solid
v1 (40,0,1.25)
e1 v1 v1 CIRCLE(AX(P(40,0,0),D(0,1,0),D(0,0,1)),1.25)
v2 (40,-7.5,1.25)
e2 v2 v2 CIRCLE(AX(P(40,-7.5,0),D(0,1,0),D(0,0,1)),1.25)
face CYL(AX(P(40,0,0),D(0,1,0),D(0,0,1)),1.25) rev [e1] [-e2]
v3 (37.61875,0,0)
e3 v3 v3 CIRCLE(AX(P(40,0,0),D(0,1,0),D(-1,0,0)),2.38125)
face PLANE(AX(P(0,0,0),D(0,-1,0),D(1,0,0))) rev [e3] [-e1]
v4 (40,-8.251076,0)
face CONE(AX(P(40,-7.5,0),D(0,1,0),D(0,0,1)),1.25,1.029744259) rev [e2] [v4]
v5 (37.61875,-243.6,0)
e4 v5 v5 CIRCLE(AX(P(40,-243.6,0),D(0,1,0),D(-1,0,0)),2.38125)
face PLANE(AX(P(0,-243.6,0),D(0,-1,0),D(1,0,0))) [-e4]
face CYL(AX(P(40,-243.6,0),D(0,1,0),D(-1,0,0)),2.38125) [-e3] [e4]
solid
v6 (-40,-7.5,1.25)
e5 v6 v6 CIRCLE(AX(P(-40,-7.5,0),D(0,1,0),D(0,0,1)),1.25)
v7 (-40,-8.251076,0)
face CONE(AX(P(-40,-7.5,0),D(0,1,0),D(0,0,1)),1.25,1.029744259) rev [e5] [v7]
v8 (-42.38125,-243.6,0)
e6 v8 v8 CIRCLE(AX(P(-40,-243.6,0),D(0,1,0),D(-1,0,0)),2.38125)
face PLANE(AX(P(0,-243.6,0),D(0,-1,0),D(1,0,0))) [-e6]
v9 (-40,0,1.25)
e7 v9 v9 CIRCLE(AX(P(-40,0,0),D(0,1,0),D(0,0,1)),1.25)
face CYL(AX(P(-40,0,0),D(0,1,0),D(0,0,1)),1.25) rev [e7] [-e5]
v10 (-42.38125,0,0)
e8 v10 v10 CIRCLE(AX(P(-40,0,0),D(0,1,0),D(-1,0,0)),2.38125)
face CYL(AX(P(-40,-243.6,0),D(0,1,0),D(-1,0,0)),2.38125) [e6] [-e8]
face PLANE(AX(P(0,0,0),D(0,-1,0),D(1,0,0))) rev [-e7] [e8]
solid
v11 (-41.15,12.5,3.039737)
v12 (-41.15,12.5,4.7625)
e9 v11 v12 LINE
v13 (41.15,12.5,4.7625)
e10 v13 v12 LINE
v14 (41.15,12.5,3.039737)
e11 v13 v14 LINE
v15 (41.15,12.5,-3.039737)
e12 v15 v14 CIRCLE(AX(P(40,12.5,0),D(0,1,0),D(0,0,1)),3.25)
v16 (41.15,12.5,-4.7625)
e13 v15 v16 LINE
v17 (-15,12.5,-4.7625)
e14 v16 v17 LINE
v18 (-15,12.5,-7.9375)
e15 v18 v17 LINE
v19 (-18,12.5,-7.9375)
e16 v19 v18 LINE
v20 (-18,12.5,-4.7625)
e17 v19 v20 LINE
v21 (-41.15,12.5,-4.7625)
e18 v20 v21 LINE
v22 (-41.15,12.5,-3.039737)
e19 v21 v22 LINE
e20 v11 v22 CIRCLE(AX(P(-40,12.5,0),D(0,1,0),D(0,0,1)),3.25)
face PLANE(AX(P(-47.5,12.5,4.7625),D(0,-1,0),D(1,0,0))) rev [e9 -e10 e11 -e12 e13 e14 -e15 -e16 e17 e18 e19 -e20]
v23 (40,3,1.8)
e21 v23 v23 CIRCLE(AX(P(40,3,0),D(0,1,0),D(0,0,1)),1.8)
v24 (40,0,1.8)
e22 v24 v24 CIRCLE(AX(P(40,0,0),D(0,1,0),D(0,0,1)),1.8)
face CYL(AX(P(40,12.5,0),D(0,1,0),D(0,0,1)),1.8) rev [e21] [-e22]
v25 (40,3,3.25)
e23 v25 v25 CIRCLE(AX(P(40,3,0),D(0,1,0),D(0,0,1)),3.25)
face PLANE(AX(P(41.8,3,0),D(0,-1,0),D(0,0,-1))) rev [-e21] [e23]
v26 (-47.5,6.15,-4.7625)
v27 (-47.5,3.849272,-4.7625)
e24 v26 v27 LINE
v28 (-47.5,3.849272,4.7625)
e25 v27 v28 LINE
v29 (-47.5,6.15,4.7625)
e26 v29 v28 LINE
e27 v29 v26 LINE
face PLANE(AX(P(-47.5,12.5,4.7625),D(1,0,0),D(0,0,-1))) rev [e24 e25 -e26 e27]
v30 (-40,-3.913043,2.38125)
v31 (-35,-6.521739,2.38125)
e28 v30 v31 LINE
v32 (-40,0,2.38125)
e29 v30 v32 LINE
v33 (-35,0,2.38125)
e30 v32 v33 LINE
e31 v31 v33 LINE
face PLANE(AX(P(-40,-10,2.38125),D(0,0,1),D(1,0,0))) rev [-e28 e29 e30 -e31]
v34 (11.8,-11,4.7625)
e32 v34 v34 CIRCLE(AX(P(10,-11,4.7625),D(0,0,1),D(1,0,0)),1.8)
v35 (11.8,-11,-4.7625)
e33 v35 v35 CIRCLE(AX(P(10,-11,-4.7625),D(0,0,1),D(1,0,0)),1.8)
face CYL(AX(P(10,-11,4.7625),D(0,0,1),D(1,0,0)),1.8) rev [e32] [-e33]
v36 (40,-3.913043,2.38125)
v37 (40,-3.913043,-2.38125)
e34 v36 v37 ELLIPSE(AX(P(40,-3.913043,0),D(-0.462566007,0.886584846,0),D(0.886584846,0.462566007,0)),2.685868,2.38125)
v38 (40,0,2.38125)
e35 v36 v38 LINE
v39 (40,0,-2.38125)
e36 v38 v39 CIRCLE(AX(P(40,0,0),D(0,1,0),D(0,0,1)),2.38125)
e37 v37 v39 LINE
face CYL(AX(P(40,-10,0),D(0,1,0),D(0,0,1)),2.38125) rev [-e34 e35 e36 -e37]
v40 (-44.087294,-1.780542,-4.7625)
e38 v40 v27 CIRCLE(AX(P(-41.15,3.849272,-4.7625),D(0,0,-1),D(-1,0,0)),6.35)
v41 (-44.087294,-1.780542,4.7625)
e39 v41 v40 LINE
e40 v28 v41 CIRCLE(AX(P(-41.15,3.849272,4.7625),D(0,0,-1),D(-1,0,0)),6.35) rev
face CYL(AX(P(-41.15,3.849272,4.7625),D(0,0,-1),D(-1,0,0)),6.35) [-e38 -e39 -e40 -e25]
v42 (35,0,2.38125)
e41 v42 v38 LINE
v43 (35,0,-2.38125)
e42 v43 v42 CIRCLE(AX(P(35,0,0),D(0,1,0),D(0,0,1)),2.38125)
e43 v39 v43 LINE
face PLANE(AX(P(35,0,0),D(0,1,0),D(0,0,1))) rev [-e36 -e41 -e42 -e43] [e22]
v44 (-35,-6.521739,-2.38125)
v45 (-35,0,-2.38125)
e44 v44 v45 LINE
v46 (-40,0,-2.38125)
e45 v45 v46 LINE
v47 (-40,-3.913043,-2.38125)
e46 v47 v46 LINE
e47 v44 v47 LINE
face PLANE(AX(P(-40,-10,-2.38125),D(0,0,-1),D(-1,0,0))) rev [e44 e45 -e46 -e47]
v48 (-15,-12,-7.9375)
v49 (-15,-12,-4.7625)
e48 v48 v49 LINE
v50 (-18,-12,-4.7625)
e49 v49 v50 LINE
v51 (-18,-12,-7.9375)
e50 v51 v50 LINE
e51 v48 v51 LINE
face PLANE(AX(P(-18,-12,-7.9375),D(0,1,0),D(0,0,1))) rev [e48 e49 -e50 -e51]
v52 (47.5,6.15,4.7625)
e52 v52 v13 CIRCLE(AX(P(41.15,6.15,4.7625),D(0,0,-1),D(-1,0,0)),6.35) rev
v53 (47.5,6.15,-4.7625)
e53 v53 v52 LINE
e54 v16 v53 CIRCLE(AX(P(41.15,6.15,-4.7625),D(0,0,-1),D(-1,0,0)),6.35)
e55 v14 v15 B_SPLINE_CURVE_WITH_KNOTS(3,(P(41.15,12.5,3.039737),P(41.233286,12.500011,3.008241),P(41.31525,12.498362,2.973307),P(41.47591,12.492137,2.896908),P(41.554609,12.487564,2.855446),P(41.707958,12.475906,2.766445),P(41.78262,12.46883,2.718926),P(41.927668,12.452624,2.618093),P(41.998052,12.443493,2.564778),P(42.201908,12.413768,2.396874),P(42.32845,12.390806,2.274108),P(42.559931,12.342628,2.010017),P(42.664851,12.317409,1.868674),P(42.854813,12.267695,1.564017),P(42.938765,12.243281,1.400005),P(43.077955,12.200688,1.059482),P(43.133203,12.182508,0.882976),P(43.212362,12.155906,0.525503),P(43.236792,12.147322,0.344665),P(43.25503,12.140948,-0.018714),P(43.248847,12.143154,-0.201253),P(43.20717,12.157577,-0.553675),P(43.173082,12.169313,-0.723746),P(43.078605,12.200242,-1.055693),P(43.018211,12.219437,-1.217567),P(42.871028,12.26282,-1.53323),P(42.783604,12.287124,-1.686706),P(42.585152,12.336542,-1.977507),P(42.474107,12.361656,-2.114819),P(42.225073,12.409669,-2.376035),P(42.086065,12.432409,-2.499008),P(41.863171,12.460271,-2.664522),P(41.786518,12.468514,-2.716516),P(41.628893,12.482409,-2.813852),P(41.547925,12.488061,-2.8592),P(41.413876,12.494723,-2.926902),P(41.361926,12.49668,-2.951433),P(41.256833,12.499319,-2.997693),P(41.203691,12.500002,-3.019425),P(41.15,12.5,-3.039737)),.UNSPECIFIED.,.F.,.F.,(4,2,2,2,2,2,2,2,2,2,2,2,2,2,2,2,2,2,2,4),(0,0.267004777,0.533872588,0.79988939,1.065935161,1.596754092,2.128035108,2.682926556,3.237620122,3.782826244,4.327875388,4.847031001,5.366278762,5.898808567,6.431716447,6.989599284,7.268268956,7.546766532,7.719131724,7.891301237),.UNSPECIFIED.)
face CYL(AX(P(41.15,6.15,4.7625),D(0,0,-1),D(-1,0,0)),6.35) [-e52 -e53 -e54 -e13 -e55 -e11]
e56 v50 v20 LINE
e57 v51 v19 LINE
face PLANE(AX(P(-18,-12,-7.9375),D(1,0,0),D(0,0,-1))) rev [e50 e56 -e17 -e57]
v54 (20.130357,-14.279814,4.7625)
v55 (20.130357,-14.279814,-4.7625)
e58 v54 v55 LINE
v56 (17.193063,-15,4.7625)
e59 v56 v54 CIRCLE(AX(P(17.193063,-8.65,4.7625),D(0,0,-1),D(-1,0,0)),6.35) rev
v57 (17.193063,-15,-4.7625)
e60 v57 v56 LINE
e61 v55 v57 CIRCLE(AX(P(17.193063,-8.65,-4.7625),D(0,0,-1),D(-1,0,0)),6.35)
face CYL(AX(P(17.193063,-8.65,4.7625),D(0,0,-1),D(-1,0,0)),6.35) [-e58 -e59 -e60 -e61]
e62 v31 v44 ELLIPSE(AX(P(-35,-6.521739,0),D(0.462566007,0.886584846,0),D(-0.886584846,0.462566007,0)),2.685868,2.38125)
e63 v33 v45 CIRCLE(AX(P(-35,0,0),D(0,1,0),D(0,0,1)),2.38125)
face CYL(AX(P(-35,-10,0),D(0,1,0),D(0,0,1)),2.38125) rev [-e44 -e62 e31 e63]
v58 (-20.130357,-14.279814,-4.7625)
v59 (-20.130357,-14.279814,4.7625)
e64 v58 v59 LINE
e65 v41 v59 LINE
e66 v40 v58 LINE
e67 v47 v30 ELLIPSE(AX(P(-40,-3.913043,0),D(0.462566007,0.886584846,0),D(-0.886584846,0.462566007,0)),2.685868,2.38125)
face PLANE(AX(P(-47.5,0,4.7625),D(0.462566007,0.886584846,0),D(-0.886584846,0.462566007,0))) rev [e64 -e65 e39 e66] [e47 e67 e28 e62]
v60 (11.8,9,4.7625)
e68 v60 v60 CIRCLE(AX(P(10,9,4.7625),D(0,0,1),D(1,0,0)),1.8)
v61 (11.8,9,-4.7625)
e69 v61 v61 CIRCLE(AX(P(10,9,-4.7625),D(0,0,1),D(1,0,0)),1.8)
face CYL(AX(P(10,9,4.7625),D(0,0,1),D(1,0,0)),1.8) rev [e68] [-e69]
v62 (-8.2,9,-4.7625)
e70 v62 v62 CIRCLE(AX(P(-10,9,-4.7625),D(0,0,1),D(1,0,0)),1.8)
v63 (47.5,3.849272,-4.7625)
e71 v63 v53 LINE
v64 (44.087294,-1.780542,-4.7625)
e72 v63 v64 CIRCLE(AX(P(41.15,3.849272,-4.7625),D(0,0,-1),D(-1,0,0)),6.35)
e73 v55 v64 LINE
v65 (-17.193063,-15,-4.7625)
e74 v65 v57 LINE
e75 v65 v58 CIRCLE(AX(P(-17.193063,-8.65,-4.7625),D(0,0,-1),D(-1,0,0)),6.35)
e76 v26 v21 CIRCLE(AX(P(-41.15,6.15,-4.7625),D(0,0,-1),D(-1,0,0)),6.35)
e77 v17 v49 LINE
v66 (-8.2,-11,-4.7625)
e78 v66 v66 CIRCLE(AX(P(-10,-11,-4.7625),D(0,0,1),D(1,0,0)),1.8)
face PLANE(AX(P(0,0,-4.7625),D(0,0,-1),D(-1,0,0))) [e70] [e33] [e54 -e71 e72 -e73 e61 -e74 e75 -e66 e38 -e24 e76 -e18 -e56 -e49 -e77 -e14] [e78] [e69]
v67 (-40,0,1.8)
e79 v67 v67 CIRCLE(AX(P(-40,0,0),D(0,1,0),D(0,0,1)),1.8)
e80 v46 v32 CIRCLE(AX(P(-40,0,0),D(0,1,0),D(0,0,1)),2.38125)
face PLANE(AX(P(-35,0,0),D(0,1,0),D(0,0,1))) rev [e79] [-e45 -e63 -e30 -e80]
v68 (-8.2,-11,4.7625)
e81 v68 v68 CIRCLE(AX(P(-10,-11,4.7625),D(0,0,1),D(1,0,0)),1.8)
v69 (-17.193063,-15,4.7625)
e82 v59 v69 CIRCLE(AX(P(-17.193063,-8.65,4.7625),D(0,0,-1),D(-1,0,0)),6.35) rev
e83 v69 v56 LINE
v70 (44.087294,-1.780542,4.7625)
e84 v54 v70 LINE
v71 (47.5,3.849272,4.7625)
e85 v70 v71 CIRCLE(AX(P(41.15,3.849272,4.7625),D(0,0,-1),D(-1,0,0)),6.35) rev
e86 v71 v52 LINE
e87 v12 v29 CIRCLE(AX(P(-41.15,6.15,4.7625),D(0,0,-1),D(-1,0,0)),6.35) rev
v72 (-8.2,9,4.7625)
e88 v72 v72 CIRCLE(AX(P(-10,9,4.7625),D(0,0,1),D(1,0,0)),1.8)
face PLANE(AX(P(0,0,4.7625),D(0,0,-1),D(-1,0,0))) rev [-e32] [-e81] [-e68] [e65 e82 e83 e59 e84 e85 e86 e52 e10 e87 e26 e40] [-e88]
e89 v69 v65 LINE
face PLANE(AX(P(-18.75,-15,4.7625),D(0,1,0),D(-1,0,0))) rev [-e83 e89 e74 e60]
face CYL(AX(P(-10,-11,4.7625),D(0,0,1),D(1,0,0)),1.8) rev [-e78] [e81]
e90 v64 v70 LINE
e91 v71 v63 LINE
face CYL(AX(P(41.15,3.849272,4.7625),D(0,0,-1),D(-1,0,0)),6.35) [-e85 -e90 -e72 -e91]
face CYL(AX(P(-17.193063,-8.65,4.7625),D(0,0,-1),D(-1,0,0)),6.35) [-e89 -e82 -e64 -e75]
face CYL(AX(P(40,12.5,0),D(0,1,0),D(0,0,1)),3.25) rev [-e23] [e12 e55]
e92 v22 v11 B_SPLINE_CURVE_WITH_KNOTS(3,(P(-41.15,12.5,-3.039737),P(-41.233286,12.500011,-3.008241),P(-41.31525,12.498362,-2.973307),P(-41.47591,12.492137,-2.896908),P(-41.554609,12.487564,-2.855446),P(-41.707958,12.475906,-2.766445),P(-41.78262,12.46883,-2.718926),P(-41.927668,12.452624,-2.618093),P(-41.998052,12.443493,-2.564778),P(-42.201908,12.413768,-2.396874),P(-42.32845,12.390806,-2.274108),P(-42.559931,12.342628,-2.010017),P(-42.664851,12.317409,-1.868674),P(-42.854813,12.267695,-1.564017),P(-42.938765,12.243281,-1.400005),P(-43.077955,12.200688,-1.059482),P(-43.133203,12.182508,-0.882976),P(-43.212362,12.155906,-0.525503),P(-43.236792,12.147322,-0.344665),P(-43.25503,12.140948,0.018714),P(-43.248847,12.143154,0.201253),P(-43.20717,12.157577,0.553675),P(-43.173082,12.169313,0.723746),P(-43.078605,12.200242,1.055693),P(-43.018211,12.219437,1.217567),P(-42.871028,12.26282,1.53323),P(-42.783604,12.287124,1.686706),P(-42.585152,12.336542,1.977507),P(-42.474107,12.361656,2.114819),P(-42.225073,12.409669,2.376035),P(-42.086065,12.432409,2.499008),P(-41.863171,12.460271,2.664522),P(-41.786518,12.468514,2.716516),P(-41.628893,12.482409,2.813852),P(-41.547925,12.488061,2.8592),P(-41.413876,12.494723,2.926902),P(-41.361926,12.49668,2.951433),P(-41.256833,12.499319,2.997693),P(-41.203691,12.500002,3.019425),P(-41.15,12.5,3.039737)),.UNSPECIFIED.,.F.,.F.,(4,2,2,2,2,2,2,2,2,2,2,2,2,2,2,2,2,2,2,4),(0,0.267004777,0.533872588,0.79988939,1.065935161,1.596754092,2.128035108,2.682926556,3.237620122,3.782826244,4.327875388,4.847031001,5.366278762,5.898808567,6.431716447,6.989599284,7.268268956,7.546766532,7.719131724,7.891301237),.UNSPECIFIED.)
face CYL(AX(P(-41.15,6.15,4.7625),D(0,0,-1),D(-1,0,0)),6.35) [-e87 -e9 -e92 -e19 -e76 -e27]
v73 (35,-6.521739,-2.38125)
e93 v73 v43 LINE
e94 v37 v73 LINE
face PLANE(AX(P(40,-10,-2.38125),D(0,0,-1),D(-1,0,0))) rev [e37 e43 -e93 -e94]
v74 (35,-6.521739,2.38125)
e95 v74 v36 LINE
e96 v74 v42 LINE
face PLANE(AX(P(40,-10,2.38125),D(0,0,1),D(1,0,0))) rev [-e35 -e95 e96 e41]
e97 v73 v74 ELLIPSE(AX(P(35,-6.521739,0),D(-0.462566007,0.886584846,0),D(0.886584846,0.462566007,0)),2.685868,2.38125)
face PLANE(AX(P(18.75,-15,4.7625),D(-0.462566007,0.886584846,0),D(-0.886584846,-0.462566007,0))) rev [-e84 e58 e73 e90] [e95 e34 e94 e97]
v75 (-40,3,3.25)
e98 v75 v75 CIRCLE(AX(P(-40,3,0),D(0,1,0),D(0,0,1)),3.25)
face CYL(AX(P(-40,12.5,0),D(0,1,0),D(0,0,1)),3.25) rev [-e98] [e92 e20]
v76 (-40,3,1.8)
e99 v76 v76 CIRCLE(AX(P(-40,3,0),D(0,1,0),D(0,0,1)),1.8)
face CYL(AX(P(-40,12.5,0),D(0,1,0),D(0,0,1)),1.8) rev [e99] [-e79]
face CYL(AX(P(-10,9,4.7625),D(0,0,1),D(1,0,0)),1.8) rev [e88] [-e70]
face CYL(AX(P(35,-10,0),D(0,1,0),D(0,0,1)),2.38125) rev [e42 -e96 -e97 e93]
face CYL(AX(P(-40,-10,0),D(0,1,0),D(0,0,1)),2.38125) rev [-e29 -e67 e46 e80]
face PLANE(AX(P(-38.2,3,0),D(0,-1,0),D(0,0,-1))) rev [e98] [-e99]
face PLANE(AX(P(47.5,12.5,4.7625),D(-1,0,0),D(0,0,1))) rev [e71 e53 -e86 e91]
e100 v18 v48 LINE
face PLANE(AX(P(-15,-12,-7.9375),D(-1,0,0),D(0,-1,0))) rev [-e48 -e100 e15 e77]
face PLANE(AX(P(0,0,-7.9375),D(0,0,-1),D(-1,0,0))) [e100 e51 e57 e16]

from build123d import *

# Parameters (mm, degrees)
BOSS_EXTRUDE1_DEPTH            = 4.7625
CUT_EXTRUDE1_DEPTH             = 10
SKETCH4_W                      = 2.38125
SKETCH4_H                      = 243.6
SKETCH4_3_W                    = 2.38125
SKETCH4_3_H                    = 243.6
SKETCH6_W                      = 1.8
SKETCH6_H                      = 9.525
M3_CLEARANCE_HOLE1_AT_2_COUNT  = 2
M3_CLEARANCE_HOLE1_AT_2_PITCH  = 20
M3_CLEARANCE_HOLE1_AT_3_COUNT  = 2
M3_CLEARANCE_HOLE1_AT_3_PITCH  = 28.284271247
M3_CLEARANCE_HOLE1_AT_4_COUNT  = 2
M3_CLEARANCE_HOLE1_AT_4_PITCH  = 20
CBORE_FOR_M3_SHCS2_AT_2_COUNT  = 2
CBORE_FOR_M3_SHCS2_AT_2_PITCH  = 80
M3X0_5_TAPPED_HOLE1_AT_2_COUNT = 2
M3X0_5_TAPPED_HOLE1_AT_2_PITCH = 80
FILLET1_R                      = 6.35
SKETCH16_W                     = 3
SKETCH16_H                     = 24.5
BOSS_EXTRUDE2_DEPTH            = 3.175


with BuildPart() as part:
    # Sketch3 → Boss-Extrude1 (new, symmetric)
    with BuildSketch(Plane.XY):
        Polygon((-47.5, 12.5), (-47.5, 0), (-18.75, -15), (18.75, -15), (47.5, 0), (47.5, 12.5), align=None)
    extrude(amount=BOSS_EXTRUDE1_DEPTH, both=True)

    # Sketch10 → Cut-Extrude1 (cut)
    with BuildSketch(Plane(origin=(0, 0, 0), x_dir=(1, 0, 0), z_dir=(0, 1, 0))):
        with BuildLine():
            Line((40, 2.38125), (35, 2.38125))
            ThreePointArc((35, 2.38125), (32.61875, 0), (35, -2.38125))
            Line((35, -2.38125), (40, -2.38125))
            ThreePointArc((40, -2.38125), (42.38125, 0), (40, 2.38125))
        make_face()
        with BuildLine():
            Line((-40, 2.38125), (-35, 2.38125))
            ThreePointArc((-35, 2.38125), (-32.61875, 0), (-35, -2.38125))
            Line((-35, -2.38125), (-40, -2.38125))
            ThreePointArc((-40, -2.38125), (-42.38125, 0), (-40, 2.38125))
        make_face()
    extrude(amount=-CUT_EXTRUDE1_DEPTH, mode=Mode.SUBTRACT)

    # Sketch6 → M3 Clearance Hole1 (revolve, cut)
    with BuildSketch(Plane(origin=(-10, 9, 4.7625), x_dir=(0, -1, 0), z_dir=(1, 0, 0))):
        with Locations((0.9, 4.7625)):
            Rectangle(SKETCH6_W, SKETCH6_H)
    m3_clearance_hole1 = revolve(axis=Axis((-10, 9, 11.1125), (0, 0, -1)), mode=Mode.SUBTRACT)

    # M3 Clearance Hole1 at 2: M3 Clearance Hole1 ×2
    with Locations(*[(0, -i * M3_CLEARANCE_HOLE1_AT_2_PITCH, 0) for i in range(1, M3_CLEARANCE_HOLE1_AT_2_COUNT)]):
        add(m3_clearance_hole1, mode=Mode.SUBTRACT)

    # M3 Clearance Hole1 at 3: M3 Clearance Hole1 ×2
    with Locations(*[Vector(0.707106781186549, -0.707106781186546, 0) * (i * M3_CLEARANCE_HOLE1_AT_3_PITCH) for i in range(1, M3_CLEARANCE_HOLE1_AT_3_COUNT)]):
        add(m3_clearance_hole1, mode=Mode.SUBTRACT)

    # M3 Clearance Hole1 at 4: M3 Clearance Hole1 ×2
    with Locations(*[(i * M3_CLEARANCE_HOLE1_AT_4_PITCH, 0, 0) for i in range(1, M3_CLEARANCE_HOLE1_AT_4_COUNT)]):
        add(m3_clearance_hole1, mode=Mode.SUBTRACT)

    # Sketch12 → CBORE for M3 SHCS2 (revolve, cut)
    with BuildSketch(Plane(origin=(-40, 12.5, 0), x_dir=(0, 0, 1), z_dir=(1, 0, 0))):
        Polygon((0, 0), (0, 256.1), (1.8, 256.1), (1.8, 9.5), (3.25, 9.5), (3.25, 0), align=None)
    cbore_for_m3_shcs2 = revolve(axis=Axis((-40, 18.85, 0), (0, -1, 0)), mode=Mode.SUBTRACT)

    # CBORE for M3 SHCS2 at 2: CBORE for M3 SHCS2 ×2
    with Locations(*[(i * CBORE_FOR_M3_SHCS2_AT_2_PITCH, 0, 0) for i in range(1, CBORE_FOR_M3_SHCS2_AT_2_COUNT)]):
        add(cbore_for_m3_shcs2, mode=Mode.SUBTRACT)

    # Fillet1
    # the kernel refuses this fillet: 6.35 mm, written as the material it takes off along each edge
    with BuildSketch(Plane(origin=(47.5, 12.5, 20.6375), x_dir=(-1, 0, 0), z_dir=(0, 0, -1)), Plane(origin=(-47.5, 12.5, 20.6375), x_dir=(0, -1, 0), z_dir=(0, 0, -1))) as fillet1_piece_1:
        with BuildLine():
            CenterArc((FILLET1_R, -FILLET1_R), FILLET1_R, 90, 90)
            Line((0, -FILLET1_R), (0, 0))
            Line((0, 0), (FILLET1_R, 0))
        make_face()
    extrude(amount=41.275, mode=Mode.SUBTRACT)
    with BuildSketch(Plane(origin=(47.5, 0, 14.385678967), x_dir=(0, 1, 0), z_dir=(0, 0, -1)), Plane(origin=(-47.5, 0, -14.385678967), x_dir=(0, 1, 0), z_dir=(0, 0, 1))) as fillet1_piece_2:
        with BuildLine():
            CenterArc((FILLET1_R * 0.606184501832, -FILLET1_R), FILLET1_R, 90, 62.447188423)
            Line((-FILLET1_R * 0.280400344333, -FILLET1_R * 0.537433993305), (0, 0))
            Line((0, 0), (FILLET1_R * 0.606184501832, 0))
        make_face()
    extrude(amount=28.771357933, mode=Mode.SUBTRACT)
    with BuildSketch(Plane(origin=(18.75, -15, -8.654843019), x_dir=(-1, 0, 0), z_dir=(0, 0, 1)), Plane(origin=(-18.75, -15, -8.654843019), x_dir=(-0.8865848461654543, 0.4625660066950205, 0), z_dir=(0, 0, 1))) as fillet1_piece_3:
        with BuildLine():
            CenterArc((FILLET1_R * 0.245186961845, -FILLET1_R), FILLET1_R, 90, 27.552811577)
            Line((-FILLET1_R * 0.21737904485, -FILLET1_R * 0.113415153835), (0, 0))
            Line((0, 0), (FILLET1_R * 0.245186961845, 0))
        make_face()
    extrude(amount=17.309686039, mode=Mode.SUBTRACT)

    # Sketch16 → Boss-Extrude2 (add)
    with BuildSketch(Plane(origin=(0, 0, -4.7625), x_dir=(-1, 0, 0), z_dir=(0, 0, -1))):
        with Locations((16.5, 0.25)):
            Rectangle(SKETCH16_W, SKETCH16_H)
    extrude(amount=BOSS_EXTRUDE2_DEPTH)


with BuildPart() as body_2:
    # Sketch4 → Revolve1 (revolve)
    with BuildSketch(Plane.XY):
        with Locations((-41.190625, -121.8)):
            Rectangle(SKETCH4_W, SKETCH4_H)
    revolve(axis=Axis((-40, -243.6, 0), (0, -1, 0)))

    # Sketch14 → M3x0.5 Tapped Hole1 (revolve, cut)
    with BuildSketch(Plane(origin=(-40, 0, 0), x_dir=(0, 0, 1), z_dir=(1, 0, 0))):
        Polygon((0, 0), (0, 8.251075774), (1.25, 7.5), (1.25, 0), align=None)
    m3x0_5_tapped_hole1 = revolve(axis=Axis((-40, 6.35, 0), (0, -1, 0)), mode=Mode.SUBTRACT)


with BuildPart() as body_3:
    # Sketch4<3> → Revolve2 (revolve)
    with BuildSketch(Plane.XY):
        with Locations((38.809375, -121.8)):
            Rectangle(SKETCH4_3_W, SKETCH4_3_H)
    revolve(axis=Axis((40, -243.6, 0), (0, -1, 0)))

    # M3x0.5 Tapped Hole1 at 2: M3x0.5 Tapped Hole1 ×2
    with Locations(*[(i * M3X0_5_TAPPED_HOLE1_AT_2_PITCH, 0, 0) for i in range(1, M3X0_5_TAPPED_HOLE1_AT_2_COUNT)]):
        add(m3x0_5_tapped_hole1, mode=Mode.SUBTRACT)


solid = Compound([part.part, body_2.part, body_3.part])
